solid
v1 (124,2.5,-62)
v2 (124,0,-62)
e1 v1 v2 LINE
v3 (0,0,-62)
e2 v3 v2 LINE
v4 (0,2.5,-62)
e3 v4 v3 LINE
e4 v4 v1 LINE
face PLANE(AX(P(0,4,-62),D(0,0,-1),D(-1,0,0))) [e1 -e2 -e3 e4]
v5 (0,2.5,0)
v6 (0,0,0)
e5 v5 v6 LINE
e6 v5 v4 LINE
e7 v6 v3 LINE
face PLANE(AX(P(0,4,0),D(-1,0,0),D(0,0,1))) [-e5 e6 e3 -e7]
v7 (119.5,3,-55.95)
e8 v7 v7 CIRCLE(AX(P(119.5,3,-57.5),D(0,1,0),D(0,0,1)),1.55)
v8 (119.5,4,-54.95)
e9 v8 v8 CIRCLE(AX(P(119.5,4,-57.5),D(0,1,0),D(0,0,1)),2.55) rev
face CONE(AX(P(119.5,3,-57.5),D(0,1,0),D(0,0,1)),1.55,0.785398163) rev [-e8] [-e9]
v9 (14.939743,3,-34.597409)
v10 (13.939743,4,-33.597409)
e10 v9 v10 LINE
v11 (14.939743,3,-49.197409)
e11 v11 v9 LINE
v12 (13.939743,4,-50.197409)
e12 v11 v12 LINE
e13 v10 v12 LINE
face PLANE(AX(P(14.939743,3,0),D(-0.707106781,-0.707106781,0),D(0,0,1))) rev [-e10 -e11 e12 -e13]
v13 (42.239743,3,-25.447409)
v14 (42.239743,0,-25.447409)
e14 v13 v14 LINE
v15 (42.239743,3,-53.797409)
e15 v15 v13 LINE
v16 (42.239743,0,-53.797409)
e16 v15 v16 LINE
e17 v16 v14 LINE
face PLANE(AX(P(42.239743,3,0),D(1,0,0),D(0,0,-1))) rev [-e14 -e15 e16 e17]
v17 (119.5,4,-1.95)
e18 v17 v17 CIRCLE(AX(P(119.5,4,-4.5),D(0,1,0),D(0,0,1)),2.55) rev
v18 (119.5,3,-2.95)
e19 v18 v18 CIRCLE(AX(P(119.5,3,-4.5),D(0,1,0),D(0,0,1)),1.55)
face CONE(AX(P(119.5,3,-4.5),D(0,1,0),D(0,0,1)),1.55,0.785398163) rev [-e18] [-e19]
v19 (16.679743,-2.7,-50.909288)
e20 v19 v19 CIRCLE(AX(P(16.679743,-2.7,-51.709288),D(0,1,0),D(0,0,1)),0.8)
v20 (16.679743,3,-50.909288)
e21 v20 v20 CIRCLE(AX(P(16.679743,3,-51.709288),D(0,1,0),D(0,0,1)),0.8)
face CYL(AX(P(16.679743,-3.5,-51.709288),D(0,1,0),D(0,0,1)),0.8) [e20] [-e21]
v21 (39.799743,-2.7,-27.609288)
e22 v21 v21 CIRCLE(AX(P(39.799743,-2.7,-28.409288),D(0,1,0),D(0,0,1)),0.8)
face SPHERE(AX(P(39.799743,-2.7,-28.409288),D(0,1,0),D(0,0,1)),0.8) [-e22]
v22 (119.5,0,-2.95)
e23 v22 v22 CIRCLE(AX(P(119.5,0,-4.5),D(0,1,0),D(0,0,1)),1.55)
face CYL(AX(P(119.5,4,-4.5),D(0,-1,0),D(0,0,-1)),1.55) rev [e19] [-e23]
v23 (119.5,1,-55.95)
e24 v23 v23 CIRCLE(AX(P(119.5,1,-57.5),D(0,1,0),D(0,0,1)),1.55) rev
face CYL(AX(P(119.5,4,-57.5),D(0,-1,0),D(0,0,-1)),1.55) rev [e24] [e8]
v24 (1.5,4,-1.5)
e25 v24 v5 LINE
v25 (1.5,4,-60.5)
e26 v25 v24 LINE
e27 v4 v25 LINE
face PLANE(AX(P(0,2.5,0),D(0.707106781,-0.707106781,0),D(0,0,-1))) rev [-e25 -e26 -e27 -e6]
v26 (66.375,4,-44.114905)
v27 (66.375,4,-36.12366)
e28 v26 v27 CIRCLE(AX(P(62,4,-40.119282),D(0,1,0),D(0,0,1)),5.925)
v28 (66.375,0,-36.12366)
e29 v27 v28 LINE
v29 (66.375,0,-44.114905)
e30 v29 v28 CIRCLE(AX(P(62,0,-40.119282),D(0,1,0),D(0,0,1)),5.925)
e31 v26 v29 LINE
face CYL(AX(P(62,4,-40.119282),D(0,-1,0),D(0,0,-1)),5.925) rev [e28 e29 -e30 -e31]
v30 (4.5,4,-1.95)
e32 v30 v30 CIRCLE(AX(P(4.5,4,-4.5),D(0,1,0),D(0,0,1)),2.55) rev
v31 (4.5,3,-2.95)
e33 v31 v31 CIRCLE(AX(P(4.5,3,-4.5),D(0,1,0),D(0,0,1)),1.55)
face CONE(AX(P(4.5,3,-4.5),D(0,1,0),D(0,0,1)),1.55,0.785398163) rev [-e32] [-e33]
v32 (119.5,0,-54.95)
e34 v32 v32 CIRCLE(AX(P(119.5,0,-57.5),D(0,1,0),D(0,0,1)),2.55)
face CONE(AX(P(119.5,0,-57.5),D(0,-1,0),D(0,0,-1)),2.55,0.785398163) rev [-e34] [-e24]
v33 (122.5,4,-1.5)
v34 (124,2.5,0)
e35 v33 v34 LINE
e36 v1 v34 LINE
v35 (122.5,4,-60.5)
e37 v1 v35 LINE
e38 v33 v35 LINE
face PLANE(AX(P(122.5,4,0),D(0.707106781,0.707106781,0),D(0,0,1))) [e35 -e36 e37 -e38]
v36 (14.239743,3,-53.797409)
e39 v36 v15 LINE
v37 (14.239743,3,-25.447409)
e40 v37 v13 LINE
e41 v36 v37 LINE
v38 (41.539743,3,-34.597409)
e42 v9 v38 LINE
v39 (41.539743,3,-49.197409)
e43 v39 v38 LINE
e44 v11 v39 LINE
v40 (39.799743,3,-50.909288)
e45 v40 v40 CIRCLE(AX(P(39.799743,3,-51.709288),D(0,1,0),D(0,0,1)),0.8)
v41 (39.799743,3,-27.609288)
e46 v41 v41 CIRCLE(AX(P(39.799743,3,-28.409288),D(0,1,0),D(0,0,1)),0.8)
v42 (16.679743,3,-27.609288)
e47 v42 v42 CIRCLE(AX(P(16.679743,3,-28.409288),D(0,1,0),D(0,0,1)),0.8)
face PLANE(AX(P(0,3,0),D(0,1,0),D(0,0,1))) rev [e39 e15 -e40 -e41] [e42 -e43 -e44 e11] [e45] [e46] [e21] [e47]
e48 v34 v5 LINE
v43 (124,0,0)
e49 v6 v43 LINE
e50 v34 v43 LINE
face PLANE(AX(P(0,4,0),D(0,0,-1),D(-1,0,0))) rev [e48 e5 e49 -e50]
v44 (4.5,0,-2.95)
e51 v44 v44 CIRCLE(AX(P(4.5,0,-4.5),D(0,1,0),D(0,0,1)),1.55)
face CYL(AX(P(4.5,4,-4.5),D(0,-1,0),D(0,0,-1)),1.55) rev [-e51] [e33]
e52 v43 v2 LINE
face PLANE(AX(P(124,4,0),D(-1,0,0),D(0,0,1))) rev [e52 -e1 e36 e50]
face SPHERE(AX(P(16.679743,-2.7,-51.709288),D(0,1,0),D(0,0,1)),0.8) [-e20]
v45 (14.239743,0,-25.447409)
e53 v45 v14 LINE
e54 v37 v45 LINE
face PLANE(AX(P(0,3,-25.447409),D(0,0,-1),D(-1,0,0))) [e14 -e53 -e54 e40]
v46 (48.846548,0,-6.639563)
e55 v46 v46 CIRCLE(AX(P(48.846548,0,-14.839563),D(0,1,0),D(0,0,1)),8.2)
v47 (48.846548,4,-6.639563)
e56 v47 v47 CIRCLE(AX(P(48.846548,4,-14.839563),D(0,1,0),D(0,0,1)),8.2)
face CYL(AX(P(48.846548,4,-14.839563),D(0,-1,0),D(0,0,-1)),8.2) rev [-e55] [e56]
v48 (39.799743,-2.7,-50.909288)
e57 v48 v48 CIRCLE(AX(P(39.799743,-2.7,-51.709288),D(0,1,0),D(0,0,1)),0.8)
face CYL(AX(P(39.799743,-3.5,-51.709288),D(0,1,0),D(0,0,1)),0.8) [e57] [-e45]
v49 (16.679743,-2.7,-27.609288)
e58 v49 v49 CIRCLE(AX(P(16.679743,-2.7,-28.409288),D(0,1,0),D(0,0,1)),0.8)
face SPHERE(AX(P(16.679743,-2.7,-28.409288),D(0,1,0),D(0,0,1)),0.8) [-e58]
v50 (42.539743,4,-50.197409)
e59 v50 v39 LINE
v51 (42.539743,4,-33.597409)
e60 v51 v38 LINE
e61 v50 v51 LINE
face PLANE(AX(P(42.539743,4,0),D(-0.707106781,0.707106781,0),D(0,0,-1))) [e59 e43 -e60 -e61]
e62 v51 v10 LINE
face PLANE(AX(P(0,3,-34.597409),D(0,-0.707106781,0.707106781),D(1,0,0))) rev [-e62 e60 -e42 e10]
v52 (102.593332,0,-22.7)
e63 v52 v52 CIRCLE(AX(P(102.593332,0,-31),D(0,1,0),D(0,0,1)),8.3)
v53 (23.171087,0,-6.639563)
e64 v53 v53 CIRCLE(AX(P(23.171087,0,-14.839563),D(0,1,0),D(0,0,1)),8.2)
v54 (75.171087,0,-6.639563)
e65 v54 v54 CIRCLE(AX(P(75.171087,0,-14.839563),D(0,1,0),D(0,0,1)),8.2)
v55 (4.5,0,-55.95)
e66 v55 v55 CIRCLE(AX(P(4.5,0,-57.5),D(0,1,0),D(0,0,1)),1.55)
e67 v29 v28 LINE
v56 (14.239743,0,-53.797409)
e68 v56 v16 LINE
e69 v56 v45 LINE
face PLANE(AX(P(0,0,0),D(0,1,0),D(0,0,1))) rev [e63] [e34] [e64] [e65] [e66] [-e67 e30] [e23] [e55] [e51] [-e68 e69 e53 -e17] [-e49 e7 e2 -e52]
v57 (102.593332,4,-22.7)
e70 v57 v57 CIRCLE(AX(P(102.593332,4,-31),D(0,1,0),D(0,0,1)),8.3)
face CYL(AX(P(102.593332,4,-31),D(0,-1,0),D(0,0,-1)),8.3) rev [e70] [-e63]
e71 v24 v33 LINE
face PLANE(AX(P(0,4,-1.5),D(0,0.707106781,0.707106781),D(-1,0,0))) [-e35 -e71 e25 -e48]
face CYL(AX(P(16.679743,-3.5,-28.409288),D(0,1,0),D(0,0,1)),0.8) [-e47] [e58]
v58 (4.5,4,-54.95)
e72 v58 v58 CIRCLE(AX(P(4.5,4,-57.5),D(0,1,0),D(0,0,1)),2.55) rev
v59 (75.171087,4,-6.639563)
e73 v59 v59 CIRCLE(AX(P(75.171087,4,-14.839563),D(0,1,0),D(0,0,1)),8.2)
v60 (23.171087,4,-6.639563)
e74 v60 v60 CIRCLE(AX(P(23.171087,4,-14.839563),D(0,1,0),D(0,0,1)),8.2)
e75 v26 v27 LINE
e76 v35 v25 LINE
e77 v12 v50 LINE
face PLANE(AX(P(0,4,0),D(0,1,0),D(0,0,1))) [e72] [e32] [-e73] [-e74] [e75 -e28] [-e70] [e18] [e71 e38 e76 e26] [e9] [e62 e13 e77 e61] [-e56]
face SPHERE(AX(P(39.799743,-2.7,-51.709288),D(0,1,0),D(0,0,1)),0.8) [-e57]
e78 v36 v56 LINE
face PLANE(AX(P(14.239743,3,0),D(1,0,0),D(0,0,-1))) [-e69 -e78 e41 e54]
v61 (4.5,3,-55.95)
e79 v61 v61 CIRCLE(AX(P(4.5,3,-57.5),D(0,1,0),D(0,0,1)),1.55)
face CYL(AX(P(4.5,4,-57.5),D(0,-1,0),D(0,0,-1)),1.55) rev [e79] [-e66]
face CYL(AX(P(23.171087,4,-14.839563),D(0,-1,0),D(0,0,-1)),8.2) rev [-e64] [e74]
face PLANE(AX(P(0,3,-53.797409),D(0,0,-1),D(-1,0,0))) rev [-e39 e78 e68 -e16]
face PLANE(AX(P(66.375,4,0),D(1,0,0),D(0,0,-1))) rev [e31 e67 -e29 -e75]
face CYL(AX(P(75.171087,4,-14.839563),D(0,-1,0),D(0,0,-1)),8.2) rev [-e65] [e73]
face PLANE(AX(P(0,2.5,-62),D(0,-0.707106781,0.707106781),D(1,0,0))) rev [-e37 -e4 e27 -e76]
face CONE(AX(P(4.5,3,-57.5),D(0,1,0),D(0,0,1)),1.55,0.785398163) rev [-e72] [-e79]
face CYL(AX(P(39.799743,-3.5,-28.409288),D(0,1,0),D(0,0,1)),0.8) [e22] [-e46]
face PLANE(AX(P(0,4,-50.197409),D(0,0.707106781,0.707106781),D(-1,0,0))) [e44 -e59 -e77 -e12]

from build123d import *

# Parameters (mm, degrees)
SKETCH2_W           = 124
SKETCH2_H           = 62
SKETCH2_R           = 1.55
SKETCH2_W_2         = 26.6
SKETCH2_H_2         = 14.6
SKETCH2_R_2         = 8.3
SKETCH2_R_3         = 8.2
BOSS_EXTRUDE1_DEPTH = 4
CHAMFER1_SIZE       = 1.5
CHAMFER2_SIZE       = 1
SKETCH2_3_R         = 0.8
BOSS_EXTRUDE2_DEPTH = 3.5
FILLET1_R           = 0.8
CUT_EXTRUDE1_START  = 3
SKETCH2_4_W         = 28
SKETCH2_4_H         = 28.35
SKETCH2_4_R         = 0.8
SKETCH2_4_W_2       = 26.6
SKETCH2_4_H_2       = 14.6
CUT_EXTRUDE1_DEPTH  = 3
CHAMFER3_SIZE       = 1


with BuildPart() as part:
    # Sketch2 → Boss-Extrude1 (new body)
    with BuildSketch(Plane(origin=(0, 0, 0), x_dir=(1, 0, 0), z_dir=(0, 1, 0))):
        with Locations((62, 31)):
            Rectangle(SKETCH2_W, SKETCH2_H)
        with Locations(Location((4.5, 4.5, 0), (0, 0, 270))):
            Circle(SKETCH2_R, mode=Mode.SUBTRACT)
        with Locations(Location((119.5, 4.5, 0), (0, 0, 270))):
            Circle(SKETCH2_R, mode=Mode.SUBTRACT)
        with Locations(Location((4.5, 57.5, 0), (0, 0, 270))):
            Circle(SKETCH2_R, mode=Mode.SUBTRACT)
        with Locations(Location((119.5, 57.5, 0), (0, 0, 270))):
            Circle(SKETCH2_R, mode=Mode.SUBTRACT)
        with Locations((28.239743387, 41.89740921)):
            Rectangle(SKETCH2_W_2, SKETCH2_H_2, mode=Mode.SUBTRACT)
        with Locations(Location((102.593331931, 31, 0), (0, 0, 270))):
            Circle(SKETCH2_R_2, mode=Mode.SUBTRACT)
        with Locations(Location((75.171087178, 14.839562505, 0), (0, 0, 270))):
            Circle(SKETCH2_R_3, mode=Mode.SUBTRACT)
        with BuildLine():
            ThreePointArc((66.375, 36.123659504), (56.075, 40.119282109), (66.375, 44.114904714))
            Line((66.375, 44.114904714), (66.375, 36.123659504))
        make_face(mode=Mode.SUBTRACT)
        with Locations(Location((48.846547615, 14.839562505, 0), (0, 0, 270))):
            Circle(SKETCH2_R_3, mode=Mode.SUBTRACT)
        with Locations(Location((23.171087178, 14.839562505, 0), (0, 0, 270))):
            Circle(SKETCH2_R_3, mode=Mode.SUBTRACT)
    extrude(amount=BOSS_EXTRUDE1_DEPTH)

    # Chamfer1
    chamfer1_edges = [part.edges().sort_by_distance(p)[0] for p in [
        (62, 4, 0),
        (124, 4, -31),
        (62, 4, -62),
        (0, 4, -31),
    ]]
    chamfer(chamfer1_edges, length=CHAMFER1_SIZE)

    # Chamfer2
    chamfer2_edges = [part.edges().sort_by_distance(p)[0] for p in [
        (119.5, 0, -59.05),
        (4.5, 4, -6.05),
        (119.5, 4, -59.05),
        (119.5, 4, -6.05),
        (4.5, 4, -59.05),
    ]]
    chamfer(chamfer2_edges, length=CHAMFER2_SIZE)

    # Sketch2<3> → Boss-Extrude2 (add)
    with BuildSketch(Plane(origin=(0, 0, 0), x_dir=(1, 0, 0), z_dir=(0, 1, 0))):
        with Locations(Location((16.679743387, 28.409287577, 0), (0, 0, 270))):
            Circle(SKETCH2_3_R)
        with Locations(Location((16.679743387, 51.709287577, 0), (0, 0, 270))):
            Circle(SKETCH2_3_R)
        with Locations(Location((39.799743387, 28.409287577, 0), (0, 0, 270))):
            Circle(SKETCH2_3_R)
        with Locations(Location((39.799743387, 51.709287577, 0), (0, 0, 270))):
            Circle(SKETCH2_3_R)
    extrude(amount=-BOSS_EXTRUDE2_DEPTH)

    # Fillet1
    fillet1_edges = [part.edges().sort_by_distance(p)[0] for p in [
        (39.799743387, -3.5, -29.209287577),
        (39.799743387, -3.5, -52.509287577),
        (16.679743387, -3.5, -29.209287577),
        (16.679743387, -3.5, -52.509287577),
    ]]
    fillet(fillet1_edges, radius=FILLET1_R)

    # Sketch2<4> → Cut-Extrude1 (cut)
    with BuildSketch(Plane(origin=(0, 0, 0), x_dir=(1, 0, 0), z_dir=(0, 1, 0)).offset(CUT_EXTRUDE1_START)):
        with Locations((28.239743387, 39.62240921)):
            Rectangle(SKETCH2_4_W, SKETCH2_4_H)
        with Locations(Location((16.679743387, 51.709287577, 0), (0, 0, 270))):
            Circle(SKETCH2_4_R, mode=Mode.SUBTRACT)
        with Locations(Location((16.679743387, 28.409287577, 0), (0, 0, 270))):
            Circle(SKETCH2_4_R, mode=Mode.SUBTRACT)
        with Locations(Location((39.799743387, 28.409287577, 0), (0, 0, 270))):
            Circle(SKETCH2_4_R, mode=Mode.SUBTRACT)
        with Locations(Location((39.799743387, 51.709287577, 0), (0, 0, 270))):
            Circle(SKETCH2_4_R, mode=Mode.SUBTRACT)
        with Locations((28.239743387, 41.89740921)):
            Rectangle(SKETCH2_4_W_2, SKETCH2_4_H_2, mode=Mode.SUBTRACT)
    extrude(amount=-CUT_EXTRUDE1_DEPTH, mode=Mode.SUBTRACT)

    # Chamfer3
    chamfer3_edges = [part.edges().sort_by_distance(p)[0] for p in [
        (28.239743387, 4, -34.59740921),
        (41.539743387, 4, -41.89740921),
        (14.939743387, 4, -41.89740921),
        (28.239743387, 4, -49.19740921),
    ]]
    chamfer(chamfer3_edges, length=CHAMFER3_SIZE - 0.0001)  # a hair under: the kernel refuses the full size


solid = part.part
